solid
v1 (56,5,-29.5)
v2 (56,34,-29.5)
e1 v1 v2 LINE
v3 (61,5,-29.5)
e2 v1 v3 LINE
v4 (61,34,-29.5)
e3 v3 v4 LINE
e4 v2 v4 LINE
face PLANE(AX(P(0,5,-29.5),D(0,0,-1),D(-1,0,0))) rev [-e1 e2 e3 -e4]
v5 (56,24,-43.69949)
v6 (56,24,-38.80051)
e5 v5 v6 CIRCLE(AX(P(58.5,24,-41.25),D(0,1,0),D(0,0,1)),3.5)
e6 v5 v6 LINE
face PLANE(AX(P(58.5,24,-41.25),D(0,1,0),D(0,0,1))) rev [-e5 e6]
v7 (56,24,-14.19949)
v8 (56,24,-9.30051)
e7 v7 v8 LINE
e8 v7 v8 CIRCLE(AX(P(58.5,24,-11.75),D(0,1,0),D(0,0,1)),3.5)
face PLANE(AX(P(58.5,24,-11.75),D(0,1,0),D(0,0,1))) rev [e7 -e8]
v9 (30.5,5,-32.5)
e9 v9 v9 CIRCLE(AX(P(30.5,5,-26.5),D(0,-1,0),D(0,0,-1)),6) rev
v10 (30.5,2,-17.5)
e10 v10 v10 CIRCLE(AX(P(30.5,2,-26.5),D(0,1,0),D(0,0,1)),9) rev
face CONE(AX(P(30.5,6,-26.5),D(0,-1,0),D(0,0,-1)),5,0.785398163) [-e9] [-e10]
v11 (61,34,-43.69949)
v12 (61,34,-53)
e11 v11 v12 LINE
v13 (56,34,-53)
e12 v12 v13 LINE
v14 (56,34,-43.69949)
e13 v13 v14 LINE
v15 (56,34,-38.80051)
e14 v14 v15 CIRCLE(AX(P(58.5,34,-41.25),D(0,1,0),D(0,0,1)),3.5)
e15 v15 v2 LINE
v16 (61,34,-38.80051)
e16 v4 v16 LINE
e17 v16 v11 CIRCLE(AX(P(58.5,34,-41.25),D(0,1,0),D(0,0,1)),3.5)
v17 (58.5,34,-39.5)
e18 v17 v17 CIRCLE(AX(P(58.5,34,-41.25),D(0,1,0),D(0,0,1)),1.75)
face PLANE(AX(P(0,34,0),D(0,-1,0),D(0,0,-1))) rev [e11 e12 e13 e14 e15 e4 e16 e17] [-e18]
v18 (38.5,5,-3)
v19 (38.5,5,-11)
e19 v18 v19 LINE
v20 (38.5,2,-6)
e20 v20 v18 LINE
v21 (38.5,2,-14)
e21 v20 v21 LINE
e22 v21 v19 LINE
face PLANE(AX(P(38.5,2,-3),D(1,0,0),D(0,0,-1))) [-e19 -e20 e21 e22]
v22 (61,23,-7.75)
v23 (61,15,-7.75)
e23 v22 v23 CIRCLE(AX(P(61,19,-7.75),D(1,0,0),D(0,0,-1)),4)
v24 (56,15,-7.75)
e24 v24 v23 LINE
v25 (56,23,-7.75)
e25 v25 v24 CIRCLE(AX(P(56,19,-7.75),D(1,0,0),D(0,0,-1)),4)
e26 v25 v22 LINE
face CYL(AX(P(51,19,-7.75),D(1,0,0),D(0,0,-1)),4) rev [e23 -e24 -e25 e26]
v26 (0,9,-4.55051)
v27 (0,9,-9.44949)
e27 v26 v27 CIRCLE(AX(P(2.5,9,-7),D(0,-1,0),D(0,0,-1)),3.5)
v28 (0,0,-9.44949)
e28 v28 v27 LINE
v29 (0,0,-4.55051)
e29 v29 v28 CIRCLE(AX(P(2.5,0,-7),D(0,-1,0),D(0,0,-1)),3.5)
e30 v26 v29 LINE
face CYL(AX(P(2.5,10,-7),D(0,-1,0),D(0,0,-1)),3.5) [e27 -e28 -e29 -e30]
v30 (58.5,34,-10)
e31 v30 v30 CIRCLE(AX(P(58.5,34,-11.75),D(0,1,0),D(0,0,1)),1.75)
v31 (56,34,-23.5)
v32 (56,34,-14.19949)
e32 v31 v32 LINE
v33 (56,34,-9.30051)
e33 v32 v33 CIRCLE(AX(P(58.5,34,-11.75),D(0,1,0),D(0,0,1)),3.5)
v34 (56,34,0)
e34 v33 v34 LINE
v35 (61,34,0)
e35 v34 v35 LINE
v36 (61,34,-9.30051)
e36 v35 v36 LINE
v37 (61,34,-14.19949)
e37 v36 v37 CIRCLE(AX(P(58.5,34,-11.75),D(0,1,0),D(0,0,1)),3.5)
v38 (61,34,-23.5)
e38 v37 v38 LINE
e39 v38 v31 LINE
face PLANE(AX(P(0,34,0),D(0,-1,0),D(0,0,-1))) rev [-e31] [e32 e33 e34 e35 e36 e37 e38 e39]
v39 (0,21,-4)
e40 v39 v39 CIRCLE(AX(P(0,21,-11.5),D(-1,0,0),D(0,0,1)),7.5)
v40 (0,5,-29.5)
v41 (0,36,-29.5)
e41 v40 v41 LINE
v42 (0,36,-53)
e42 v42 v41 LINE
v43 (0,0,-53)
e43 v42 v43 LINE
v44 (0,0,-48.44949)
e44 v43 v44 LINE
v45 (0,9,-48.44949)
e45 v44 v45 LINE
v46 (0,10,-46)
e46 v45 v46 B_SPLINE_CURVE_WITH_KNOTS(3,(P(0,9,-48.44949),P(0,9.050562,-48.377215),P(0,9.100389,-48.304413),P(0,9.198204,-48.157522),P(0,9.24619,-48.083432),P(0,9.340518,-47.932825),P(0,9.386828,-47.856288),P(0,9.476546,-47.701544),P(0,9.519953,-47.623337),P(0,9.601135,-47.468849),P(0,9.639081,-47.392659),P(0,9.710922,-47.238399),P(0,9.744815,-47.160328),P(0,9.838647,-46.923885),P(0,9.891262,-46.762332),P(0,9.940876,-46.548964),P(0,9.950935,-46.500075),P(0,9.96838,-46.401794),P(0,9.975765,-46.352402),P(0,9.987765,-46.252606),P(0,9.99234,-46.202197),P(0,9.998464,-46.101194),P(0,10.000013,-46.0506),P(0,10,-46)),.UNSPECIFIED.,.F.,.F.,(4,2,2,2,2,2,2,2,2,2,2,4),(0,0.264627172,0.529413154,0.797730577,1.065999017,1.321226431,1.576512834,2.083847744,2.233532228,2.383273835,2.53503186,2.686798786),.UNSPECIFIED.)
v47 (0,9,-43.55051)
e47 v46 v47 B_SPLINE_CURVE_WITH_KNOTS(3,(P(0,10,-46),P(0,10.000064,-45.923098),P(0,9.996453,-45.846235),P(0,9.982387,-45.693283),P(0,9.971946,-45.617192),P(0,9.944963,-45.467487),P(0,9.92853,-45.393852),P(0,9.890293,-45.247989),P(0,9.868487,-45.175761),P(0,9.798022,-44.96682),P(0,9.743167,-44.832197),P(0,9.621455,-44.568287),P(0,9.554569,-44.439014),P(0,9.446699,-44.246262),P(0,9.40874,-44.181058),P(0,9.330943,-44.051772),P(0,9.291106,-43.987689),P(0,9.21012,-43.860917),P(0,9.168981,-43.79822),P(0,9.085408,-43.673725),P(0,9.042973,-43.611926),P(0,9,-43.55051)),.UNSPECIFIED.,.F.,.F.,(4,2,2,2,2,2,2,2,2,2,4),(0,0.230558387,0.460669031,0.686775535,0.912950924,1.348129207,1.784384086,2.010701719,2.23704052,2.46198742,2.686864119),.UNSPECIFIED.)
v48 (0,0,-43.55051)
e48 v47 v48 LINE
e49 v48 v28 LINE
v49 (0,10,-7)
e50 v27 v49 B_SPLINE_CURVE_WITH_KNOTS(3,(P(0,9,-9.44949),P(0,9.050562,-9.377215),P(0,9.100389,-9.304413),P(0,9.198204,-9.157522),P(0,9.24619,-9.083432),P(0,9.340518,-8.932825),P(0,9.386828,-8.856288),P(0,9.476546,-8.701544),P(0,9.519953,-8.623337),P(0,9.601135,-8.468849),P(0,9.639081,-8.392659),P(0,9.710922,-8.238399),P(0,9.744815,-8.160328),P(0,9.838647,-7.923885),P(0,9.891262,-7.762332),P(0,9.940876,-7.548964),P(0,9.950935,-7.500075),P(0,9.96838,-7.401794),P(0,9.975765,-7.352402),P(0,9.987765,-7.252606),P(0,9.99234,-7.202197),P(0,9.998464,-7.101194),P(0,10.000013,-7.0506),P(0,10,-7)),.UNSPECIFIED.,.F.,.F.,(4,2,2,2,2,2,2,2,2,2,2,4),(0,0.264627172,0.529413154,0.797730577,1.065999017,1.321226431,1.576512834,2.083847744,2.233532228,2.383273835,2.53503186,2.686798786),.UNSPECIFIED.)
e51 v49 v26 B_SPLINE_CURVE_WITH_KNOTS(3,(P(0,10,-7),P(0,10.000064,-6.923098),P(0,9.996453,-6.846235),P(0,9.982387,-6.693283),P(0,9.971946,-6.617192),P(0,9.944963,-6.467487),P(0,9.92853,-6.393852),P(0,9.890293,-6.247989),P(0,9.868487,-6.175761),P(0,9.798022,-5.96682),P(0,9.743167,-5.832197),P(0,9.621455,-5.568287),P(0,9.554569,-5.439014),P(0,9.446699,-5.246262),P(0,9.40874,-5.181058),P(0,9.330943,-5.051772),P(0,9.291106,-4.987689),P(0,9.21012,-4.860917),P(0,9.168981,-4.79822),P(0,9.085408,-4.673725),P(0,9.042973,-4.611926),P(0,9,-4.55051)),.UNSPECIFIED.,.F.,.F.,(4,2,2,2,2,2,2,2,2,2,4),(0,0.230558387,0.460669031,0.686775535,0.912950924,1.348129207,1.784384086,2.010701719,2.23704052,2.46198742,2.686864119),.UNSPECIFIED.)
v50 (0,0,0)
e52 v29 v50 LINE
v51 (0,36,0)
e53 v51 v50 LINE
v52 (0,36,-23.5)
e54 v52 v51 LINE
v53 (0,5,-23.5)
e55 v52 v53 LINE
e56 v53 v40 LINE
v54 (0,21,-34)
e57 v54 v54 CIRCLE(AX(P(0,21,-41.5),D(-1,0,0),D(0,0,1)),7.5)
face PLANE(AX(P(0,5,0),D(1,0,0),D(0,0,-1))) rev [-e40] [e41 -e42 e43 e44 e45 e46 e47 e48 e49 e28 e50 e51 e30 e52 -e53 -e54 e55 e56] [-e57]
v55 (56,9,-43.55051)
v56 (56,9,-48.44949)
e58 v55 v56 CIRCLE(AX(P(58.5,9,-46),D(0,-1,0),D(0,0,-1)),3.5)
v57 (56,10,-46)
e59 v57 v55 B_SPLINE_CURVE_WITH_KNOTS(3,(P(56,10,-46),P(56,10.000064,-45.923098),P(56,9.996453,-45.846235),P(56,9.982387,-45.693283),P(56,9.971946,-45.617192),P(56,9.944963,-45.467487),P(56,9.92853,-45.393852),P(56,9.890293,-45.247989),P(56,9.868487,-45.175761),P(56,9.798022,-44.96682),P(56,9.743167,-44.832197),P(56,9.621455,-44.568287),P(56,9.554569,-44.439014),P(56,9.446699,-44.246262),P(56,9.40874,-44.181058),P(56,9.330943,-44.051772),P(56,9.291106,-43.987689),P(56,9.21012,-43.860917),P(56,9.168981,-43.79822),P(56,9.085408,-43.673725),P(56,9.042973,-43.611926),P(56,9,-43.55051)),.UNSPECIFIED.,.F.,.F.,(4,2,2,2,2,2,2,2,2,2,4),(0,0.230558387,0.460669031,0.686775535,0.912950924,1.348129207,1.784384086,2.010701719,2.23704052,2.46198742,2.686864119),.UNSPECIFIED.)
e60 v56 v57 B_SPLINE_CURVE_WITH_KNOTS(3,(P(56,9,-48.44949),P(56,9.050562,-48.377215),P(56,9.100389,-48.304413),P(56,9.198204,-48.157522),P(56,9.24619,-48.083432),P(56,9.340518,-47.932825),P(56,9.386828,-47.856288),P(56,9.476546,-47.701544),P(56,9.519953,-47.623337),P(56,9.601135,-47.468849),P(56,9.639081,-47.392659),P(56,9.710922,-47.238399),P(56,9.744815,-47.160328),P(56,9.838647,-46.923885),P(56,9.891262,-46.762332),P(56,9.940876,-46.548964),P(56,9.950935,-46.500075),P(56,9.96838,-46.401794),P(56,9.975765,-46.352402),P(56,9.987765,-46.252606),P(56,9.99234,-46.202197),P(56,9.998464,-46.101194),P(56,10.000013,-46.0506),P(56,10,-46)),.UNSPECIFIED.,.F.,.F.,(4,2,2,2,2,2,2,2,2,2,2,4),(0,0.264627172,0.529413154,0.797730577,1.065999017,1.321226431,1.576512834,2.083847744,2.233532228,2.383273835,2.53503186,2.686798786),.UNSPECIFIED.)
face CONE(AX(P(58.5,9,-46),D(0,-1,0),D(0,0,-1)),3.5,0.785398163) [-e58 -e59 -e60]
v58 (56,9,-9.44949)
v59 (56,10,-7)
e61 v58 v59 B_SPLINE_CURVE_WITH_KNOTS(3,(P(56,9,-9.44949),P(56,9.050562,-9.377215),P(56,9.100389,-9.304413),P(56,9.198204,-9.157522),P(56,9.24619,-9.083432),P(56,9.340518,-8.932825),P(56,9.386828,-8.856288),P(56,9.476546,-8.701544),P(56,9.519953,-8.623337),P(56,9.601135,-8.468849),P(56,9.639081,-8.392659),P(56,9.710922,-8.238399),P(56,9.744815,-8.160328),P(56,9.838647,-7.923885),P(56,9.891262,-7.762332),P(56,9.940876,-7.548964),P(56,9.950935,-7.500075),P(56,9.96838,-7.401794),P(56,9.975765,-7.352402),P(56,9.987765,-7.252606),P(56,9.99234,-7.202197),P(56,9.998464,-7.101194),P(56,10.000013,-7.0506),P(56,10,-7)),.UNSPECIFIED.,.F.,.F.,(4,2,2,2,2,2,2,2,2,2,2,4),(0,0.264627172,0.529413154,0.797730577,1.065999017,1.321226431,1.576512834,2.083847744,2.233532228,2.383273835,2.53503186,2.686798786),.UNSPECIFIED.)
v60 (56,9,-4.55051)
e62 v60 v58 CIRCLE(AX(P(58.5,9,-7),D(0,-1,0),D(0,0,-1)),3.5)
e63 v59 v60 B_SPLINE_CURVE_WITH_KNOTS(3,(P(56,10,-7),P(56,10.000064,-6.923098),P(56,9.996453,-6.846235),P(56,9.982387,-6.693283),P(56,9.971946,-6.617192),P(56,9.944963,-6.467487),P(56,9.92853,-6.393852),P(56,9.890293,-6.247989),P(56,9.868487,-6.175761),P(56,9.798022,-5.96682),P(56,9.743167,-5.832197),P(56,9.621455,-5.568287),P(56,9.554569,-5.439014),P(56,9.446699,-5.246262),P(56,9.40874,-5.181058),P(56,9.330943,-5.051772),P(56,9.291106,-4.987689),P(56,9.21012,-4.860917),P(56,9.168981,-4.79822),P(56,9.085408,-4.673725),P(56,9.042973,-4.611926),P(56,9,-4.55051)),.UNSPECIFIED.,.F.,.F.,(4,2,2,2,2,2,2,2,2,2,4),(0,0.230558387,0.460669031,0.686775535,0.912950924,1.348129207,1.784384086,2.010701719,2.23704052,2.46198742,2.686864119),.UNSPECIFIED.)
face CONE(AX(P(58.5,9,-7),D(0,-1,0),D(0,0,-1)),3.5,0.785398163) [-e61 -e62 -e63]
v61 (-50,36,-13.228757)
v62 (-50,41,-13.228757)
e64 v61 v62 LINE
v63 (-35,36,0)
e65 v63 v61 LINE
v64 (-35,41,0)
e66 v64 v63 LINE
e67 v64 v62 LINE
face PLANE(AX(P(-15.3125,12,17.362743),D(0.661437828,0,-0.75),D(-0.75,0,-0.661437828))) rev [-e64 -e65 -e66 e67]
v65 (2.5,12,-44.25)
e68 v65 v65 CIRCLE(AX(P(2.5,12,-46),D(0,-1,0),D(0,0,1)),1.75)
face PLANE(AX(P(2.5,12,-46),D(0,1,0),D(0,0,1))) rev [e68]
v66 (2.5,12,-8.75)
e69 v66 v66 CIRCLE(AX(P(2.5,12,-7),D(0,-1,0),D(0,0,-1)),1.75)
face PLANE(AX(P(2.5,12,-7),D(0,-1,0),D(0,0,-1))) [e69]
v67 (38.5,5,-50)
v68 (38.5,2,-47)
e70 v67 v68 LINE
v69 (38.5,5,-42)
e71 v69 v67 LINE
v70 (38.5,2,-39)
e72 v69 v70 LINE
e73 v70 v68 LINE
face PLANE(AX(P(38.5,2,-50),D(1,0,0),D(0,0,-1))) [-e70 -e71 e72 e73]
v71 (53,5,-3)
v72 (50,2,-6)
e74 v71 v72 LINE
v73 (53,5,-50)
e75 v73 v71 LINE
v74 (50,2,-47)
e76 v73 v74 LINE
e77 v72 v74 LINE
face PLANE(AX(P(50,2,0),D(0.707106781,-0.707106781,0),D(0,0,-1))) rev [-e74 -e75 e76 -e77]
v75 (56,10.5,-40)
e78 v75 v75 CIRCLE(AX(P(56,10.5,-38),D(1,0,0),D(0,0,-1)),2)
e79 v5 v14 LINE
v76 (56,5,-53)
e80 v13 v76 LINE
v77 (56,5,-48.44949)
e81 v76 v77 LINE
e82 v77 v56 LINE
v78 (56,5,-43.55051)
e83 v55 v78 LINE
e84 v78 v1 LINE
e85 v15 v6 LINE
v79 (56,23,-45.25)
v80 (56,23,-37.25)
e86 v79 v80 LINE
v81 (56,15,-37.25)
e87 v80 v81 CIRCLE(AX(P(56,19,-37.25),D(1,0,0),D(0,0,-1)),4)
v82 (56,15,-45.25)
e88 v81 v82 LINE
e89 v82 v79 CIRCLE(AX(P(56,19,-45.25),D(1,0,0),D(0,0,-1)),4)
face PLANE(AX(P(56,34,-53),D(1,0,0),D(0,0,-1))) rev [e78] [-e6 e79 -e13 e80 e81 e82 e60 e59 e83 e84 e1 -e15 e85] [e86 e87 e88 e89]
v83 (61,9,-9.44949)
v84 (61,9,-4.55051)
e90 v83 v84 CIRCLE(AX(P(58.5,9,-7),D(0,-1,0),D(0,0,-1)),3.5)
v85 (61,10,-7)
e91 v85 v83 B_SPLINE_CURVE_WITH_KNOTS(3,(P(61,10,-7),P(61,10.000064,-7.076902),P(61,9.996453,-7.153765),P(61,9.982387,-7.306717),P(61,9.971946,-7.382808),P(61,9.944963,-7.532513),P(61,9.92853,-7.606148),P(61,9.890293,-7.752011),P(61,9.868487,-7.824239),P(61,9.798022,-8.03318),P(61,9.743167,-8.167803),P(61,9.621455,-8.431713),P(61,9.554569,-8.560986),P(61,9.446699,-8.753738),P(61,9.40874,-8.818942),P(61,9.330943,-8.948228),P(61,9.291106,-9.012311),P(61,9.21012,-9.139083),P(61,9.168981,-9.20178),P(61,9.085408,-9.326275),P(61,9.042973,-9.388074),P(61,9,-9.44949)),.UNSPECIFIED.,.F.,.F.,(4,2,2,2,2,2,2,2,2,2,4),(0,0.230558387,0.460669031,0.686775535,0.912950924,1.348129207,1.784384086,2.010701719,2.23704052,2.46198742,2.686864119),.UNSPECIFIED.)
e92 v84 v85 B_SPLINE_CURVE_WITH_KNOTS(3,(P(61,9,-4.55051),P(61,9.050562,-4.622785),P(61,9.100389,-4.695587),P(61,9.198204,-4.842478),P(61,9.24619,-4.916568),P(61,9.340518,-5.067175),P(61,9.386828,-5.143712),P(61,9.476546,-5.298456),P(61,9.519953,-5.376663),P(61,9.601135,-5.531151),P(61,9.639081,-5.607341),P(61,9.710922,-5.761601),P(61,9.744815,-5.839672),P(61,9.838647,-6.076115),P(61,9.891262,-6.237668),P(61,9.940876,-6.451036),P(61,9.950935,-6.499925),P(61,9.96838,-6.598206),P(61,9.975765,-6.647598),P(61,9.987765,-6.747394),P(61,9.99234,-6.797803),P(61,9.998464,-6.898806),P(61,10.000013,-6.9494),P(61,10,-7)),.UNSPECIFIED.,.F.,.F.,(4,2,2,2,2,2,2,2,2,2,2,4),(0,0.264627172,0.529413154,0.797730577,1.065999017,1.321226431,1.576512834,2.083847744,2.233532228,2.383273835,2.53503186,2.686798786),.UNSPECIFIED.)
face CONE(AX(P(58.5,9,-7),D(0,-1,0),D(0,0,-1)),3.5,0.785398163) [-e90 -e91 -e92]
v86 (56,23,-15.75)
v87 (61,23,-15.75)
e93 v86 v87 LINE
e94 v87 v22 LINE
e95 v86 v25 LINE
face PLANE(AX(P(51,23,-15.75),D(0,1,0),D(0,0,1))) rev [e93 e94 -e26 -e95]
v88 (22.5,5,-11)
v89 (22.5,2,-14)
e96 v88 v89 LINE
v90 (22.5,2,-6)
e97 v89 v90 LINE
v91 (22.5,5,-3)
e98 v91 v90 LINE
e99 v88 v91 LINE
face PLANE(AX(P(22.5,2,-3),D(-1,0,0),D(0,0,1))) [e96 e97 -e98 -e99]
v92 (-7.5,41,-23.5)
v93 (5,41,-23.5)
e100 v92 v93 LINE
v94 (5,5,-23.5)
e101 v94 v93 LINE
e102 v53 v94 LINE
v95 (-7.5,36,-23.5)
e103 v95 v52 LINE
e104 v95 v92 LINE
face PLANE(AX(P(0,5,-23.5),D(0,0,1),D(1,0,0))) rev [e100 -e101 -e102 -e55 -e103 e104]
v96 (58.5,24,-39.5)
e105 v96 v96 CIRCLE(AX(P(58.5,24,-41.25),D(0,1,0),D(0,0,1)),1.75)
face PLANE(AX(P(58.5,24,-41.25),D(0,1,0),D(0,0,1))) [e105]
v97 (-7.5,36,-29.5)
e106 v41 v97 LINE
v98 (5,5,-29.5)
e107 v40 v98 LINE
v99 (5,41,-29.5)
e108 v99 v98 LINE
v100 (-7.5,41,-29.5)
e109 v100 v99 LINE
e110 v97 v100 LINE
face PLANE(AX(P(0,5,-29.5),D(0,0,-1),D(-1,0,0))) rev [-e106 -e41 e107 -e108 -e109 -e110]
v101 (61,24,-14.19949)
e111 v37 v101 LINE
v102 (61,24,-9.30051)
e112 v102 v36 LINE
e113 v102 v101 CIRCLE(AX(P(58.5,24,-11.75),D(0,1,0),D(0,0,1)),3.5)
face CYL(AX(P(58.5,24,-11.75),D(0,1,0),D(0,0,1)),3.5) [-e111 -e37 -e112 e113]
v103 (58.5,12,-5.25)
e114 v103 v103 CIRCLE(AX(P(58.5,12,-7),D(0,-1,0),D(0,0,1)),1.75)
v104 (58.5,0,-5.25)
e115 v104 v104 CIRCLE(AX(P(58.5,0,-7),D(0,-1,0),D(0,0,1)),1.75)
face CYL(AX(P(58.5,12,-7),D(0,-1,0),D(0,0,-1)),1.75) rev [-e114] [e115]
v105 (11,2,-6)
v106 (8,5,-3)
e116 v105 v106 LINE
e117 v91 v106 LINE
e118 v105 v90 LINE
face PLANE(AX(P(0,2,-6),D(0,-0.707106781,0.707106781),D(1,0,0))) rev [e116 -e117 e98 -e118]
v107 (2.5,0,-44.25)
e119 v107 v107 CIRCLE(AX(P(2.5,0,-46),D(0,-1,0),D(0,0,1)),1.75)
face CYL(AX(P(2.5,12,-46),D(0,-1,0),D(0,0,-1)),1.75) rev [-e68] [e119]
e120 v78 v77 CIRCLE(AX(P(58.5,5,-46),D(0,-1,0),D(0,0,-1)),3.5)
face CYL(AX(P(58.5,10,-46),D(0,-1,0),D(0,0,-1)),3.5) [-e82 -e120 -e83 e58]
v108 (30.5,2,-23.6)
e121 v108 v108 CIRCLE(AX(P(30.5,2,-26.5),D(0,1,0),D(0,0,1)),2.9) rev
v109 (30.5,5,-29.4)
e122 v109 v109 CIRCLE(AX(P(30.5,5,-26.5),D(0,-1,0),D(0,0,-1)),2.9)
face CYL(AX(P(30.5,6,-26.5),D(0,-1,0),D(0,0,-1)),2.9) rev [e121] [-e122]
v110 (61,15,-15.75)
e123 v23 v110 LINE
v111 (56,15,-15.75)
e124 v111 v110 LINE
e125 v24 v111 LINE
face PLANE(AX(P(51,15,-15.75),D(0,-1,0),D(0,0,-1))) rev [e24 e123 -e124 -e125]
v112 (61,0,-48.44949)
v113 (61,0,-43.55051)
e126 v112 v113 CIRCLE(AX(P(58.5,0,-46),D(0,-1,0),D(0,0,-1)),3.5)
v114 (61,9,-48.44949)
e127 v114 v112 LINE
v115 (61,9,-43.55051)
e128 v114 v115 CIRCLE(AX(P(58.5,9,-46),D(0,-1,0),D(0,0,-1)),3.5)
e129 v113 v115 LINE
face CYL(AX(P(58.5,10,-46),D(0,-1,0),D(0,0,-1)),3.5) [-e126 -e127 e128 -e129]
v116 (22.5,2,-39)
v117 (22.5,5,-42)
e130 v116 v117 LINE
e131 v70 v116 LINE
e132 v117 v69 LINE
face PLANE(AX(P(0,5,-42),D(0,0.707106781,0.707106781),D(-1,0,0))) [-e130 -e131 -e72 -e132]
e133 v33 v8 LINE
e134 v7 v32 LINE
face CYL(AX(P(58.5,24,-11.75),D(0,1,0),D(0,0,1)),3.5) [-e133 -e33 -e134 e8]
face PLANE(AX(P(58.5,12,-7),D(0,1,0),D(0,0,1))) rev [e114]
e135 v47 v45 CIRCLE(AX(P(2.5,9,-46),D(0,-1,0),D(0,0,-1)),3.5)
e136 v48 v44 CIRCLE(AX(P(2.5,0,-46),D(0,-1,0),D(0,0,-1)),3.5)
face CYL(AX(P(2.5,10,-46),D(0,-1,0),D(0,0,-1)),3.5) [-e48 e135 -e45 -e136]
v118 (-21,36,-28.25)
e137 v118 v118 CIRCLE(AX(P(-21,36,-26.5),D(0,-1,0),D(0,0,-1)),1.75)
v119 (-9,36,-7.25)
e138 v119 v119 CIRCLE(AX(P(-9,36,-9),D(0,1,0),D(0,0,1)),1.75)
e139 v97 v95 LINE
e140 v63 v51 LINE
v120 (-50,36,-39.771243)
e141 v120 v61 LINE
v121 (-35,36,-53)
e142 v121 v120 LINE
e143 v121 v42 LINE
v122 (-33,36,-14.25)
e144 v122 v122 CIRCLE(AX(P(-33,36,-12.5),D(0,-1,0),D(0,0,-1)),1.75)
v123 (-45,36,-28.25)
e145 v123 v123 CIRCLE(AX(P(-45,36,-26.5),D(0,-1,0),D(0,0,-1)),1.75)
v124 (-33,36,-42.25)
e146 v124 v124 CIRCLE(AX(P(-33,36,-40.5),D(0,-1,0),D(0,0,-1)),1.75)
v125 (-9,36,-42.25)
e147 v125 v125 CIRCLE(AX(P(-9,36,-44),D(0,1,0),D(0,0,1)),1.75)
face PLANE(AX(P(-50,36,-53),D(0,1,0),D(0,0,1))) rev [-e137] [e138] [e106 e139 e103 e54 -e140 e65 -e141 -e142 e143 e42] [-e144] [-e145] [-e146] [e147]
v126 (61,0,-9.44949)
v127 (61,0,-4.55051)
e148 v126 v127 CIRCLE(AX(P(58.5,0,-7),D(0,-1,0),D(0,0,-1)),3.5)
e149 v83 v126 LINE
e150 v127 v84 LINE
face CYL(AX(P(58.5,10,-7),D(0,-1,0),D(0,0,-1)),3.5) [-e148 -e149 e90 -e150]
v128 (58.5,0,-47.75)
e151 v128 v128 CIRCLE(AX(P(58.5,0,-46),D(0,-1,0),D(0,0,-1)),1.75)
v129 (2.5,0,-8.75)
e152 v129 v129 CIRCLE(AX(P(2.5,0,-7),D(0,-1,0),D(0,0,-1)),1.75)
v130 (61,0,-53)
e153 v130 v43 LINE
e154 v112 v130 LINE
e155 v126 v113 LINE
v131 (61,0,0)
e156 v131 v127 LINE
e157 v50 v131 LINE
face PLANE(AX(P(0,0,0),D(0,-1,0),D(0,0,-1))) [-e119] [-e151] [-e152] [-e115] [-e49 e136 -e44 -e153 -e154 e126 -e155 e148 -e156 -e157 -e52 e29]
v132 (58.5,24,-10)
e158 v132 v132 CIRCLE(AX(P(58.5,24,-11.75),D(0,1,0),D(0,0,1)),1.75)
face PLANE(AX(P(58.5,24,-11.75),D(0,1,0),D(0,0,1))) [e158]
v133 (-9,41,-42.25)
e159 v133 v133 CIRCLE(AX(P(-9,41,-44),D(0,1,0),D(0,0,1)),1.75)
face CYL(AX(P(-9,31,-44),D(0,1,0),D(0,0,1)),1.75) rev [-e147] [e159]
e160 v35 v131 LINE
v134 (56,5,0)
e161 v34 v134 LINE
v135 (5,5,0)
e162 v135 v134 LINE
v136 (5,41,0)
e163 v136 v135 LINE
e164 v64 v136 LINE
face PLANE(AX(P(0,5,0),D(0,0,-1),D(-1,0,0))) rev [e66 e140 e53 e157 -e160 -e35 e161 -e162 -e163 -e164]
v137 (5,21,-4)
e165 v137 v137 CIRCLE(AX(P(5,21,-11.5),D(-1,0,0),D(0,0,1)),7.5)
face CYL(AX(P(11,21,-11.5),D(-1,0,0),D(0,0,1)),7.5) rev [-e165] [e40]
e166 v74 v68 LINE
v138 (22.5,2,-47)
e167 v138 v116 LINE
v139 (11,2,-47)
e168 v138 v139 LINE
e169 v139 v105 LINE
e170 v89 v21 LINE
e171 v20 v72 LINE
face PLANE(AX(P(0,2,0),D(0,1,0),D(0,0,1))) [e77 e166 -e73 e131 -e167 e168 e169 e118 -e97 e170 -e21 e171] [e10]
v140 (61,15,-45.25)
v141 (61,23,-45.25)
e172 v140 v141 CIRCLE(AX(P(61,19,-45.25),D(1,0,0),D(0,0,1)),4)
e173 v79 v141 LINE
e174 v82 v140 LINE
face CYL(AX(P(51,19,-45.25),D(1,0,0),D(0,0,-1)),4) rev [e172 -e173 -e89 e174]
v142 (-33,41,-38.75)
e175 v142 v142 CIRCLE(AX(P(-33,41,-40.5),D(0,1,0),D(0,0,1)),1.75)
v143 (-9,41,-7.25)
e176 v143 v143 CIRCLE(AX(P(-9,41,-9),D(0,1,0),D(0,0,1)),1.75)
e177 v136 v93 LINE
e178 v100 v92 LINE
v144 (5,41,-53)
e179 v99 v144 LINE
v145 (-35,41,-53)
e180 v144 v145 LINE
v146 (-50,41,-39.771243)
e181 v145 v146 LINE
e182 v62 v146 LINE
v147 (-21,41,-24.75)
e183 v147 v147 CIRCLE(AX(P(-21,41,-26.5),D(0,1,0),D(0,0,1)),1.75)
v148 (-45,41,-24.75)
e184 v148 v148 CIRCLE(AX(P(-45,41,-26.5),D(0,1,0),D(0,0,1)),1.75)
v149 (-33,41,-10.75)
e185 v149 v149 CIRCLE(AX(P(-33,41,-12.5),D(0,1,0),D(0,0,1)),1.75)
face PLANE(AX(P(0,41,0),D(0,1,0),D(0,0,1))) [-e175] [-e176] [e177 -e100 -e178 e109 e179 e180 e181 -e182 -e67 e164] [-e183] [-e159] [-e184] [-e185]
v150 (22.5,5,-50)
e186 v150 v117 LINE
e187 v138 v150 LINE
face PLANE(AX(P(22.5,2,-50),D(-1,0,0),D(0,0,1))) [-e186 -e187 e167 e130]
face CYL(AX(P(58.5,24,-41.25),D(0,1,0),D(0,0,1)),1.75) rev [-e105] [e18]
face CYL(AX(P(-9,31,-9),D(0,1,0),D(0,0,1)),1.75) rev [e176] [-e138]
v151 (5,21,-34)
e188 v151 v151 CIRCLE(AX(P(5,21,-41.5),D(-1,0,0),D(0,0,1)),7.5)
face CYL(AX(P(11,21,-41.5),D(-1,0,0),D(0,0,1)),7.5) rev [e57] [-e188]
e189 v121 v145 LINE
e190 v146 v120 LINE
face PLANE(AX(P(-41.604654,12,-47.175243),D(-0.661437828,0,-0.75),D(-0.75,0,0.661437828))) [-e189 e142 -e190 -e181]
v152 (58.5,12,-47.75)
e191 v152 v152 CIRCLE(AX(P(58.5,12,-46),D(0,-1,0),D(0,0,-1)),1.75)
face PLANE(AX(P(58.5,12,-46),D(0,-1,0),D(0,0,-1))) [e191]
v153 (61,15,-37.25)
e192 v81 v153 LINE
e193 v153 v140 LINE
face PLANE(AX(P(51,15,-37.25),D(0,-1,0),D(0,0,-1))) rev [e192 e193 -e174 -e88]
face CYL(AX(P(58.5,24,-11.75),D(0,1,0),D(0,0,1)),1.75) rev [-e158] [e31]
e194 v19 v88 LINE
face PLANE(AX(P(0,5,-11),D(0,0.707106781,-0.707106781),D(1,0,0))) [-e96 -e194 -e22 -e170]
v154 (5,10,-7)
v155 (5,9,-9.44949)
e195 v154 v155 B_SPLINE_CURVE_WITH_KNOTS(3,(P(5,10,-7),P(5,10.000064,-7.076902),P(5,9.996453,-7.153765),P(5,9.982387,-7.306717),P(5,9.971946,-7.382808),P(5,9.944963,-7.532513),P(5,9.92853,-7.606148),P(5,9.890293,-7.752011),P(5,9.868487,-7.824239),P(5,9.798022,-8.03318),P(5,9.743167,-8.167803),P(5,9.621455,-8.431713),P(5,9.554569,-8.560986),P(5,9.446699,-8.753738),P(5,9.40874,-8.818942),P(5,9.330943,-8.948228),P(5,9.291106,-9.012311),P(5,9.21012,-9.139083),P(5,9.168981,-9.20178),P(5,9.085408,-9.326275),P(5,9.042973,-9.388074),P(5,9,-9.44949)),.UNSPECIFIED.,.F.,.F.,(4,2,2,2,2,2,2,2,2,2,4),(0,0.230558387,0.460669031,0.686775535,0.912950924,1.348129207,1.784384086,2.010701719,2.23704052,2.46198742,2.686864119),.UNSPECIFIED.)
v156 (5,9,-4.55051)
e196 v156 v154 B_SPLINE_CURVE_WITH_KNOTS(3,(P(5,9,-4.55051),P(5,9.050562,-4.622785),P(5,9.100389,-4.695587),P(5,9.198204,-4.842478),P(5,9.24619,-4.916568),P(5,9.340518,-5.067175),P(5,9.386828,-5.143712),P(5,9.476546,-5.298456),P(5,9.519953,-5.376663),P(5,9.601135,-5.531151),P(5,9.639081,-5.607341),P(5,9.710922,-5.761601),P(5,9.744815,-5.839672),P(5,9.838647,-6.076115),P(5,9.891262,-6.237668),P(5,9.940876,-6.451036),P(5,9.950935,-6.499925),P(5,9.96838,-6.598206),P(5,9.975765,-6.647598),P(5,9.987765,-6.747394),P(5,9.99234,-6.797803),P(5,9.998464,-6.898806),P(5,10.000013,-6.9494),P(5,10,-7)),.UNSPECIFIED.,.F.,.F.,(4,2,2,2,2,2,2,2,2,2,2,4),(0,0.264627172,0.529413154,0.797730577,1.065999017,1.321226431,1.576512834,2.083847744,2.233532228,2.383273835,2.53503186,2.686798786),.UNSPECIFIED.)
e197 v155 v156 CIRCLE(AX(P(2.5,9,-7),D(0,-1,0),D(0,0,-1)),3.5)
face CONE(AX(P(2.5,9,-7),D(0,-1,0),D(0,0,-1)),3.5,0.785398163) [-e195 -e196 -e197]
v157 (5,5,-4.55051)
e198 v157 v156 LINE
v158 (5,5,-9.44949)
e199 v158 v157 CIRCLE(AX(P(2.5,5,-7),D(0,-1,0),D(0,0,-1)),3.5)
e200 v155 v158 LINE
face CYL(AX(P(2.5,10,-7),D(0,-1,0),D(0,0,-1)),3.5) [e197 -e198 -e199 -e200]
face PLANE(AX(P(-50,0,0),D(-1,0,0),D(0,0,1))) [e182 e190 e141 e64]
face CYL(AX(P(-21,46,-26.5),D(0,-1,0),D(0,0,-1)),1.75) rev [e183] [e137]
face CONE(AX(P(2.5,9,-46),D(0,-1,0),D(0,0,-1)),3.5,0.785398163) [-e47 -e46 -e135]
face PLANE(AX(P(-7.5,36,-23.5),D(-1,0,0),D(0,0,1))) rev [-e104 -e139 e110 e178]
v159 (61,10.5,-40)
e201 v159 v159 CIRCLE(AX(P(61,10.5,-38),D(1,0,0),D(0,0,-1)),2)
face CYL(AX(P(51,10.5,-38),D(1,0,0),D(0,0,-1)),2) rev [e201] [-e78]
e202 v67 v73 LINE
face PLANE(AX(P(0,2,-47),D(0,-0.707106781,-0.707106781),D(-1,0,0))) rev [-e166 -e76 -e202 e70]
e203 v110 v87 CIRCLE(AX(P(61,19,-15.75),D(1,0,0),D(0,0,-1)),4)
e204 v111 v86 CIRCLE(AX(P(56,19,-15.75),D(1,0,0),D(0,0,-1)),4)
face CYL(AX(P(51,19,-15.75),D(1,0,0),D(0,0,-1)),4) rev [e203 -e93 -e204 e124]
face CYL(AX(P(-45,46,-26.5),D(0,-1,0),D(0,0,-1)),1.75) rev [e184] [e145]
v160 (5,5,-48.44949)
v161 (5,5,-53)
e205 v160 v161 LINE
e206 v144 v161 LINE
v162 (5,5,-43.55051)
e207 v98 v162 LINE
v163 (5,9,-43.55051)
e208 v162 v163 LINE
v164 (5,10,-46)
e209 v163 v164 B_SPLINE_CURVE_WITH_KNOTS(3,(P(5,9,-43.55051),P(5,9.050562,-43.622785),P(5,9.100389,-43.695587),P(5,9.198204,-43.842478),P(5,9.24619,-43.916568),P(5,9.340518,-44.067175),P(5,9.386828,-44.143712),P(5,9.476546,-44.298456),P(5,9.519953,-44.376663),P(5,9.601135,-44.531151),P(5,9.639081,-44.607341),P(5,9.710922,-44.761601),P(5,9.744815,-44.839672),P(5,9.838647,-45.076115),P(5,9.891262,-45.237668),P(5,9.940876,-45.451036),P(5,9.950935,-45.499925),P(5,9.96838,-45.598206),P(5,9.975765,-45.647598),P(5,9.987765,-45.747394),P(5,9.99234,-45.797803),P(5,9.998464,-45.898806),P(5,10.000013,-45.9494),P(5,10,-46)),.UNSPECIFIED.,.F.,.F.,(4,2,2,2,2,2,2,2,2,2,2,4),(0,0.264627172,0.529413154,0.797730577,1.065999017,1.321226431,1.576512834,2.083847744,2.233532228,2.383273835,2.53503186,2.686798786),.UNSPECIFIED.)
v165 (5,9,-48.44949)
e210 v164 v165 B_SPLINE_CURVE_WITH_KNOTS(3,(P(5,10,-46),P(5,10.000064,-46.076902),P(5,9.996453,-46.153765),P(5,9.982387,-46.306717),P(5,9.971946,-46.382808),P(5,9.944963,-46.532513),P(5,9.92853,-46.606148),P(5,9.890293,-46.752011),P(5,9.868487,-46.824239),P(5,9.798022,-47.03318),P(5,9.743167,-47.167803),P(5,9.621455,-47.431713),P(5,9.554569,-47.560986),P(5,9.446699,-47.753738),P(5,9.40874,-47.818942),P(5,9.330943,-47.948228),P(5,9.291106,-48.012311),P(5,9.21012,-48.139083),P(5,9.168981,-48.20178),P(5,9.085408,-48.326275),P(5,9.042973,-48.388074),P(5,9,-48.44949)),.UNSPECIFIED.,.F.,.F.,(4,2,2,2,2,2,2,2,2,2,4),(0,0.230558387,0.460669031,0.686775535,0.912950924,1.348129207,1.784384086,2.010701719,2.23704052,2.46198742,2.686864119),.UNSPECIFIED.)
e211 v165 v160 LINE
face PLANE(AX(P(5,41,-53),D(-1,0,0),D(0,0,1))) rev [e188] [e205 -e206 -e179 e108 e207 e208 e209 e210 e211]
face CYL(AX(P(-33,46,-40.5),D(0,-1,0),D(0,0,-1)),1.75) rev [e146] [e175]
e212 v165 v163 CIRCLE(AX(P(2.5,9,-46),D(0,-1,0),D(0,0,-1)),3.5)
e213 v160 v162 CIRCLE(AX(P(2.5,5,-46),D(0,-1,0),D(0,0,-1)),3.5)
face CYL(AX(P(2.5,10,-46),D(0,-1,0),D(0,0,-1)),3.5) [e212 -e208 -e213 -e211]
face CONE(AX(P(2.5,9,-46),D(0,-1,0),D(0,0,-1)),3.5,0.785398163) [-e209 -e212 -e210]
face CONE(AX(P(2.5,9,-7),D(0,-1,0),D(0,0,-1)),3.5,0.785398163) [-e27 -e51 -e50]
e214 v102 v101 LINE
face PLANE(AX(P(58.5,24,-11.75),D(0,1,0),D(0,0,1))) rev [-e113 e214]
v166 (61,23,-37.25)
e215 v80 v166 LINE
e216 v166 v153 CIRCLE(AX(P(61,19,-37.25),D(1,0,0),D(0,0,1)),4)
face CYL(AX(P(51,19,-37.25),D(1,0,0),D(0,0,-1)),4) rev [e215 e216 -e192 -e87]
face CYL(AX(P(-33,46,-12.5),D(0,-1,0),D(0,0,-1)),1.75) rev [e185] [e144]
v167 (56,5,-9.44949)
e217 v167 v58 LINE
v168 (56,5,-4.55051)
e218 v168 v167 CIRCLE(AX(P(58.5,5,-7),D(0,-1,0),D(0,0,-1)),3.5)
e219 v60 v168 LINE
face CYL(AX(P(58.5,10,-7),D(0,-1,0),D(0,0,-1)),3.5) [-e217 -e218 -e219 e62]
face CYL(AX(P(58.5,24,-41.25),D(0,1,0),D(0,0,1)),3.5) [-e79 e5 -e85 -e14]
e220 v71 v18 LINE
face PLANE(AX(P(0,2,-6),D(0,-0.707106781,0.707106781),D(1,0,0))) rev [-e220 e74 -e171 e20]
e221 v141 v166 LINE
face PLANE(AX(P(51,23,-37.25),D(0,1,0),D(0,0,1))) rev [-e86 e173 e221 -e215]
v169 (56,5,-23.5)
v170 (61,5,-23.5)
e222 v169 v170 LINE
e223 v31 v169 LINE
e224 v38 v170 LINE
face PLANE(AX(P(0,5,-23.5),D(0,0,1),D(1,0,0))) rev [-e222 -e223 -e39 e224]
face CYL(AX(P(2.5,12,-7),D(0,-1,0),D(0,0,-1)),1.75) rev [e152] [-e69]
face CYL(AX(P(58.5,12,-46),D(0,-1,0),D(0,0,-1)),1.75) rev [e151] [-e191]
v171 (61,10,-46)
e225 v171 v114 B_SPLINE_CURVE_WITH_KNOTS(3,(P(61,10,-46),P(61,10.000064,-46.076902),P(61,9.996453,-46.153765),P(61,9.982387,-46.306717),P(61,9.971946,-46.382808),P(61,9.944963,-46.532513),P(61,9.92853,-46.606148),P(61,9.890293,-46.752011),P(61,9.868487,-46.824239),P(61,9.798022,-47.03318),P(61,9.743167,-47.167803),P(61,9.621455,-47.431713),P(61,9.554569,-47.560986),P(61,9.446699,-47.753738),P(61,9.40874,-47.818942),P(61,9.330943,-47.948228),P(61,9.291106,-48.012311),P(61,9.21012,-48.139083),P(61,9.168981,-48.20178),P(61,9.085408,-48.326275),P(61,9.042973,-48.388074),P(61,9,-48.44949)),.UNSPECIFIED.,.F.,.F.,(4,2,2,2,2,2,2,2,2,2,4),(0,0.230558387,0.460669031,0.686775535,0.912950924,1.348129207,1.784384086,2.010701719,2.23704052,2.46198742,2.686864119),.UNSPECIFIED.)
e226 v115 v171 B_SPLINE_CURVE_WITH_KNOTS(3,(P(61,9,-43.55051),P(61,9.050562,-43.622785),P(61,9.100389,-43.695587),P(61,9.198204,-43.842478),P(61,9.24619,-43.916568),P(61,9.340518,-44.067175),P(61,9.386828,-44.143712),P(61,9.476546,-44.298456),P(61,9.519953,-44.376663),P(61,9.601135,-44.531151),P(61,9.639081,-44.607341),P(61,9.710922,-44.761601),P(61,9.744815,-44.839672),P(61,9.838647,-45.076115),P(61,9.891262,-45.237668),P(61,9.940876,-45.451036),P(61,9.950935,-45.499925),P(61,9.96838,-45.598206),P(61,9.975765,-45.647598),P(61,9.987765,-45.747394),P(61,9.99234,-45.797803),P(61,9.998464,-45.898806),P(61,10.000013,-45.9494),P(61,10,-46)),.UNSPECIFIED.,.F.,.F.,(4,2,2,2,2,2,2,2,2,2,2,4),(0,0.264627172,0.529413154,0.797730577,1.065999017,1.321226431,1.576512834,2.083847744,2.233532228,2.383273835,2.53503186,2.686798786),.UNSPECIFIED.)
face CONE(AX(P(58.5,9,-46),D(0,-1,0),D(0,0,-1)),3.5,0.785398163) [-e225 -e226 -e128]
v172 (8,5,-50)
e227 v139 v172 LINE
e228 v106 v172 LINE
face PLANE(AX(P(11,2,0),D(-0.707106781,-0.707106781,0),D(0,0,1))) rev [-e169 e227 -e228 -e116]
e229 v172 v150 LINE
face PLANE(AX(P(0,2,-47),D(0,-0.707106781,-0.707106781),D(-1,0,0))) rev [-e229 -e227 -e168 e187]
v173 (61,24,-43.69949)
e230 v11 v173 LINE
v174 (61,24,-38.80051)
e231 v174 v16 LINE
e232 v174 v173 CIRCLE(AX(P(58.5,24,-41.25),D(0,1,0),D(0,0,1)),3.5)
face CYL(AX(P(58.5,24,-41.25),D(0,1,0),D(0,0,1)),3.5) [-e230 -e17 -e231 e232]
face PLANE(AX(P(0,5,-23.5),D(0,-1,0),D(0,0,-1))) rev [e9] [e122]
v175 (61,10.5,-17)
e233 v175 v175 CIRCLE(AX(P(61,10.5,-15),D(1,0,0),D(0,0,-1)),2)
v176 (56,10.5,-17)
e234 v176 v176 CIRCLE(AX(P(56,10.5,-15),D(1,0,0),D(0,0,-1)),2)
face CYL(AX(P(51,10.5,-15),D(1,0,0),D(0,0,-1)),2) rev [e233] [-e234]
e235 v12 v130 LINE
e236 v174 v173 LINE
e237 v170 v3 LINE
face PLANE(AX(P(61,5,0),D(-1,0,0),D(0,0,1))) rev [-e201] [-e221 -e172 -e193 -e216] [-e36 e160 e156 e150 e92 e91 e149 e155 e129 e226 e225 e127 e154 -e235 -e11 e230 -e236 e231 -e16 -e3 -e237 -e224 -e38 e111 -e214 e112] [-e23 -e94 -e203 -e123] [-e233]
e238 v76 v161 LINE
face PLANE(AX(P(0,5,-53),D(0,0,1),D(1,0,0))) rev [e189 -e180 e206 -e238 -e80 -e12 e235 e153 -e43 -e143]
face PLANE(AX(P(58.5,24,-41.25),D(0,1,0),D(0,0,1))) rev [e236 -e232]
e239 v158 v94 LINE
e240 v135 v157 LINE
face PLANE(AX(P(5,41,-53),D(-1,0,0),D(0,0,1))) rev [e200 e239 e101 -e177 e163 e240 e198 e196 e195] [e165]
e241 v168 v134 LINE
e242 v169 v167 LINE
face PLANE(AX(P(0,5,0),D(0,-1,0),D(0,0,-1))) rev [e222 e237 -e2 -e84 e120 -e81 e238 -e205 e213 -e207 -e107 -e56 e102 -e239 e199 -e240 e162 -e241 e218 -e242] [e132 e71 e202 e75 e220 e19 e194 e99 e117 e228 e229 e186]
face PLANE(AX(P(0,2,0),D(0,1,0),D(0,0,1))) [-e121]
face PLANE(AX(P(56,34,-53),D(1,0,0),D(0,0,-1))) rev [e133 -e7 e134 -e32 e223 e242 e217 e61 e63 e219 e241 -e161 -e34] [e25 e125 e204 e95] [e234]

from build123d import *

# Parameters (mm, degrees)
IZIM1_W                     = 61
IZIM1_H                     = 53
Y_KSEKLIK_EKSTR_ZYON1_DEPTH = 5
IZIM2_W                     = 5
IZIM2_H                     = 53
Y_KSEKLIK_EKSTR_ZYON2_DEPTH = 36
IZIM3_W                     = 53
IZIM3_H                     = 5
Y_KSEKLIK_EKSTR_ZYON3_DEPTH = 50
IZIM4_W                     = 5
IZIM4_H                     = 53
Y_KSEKLIK_EKSTR_ZYON4_DEPTH = 29
KES_EKSTR_ZYON1_DEPTH       = 29
IZIM6_W                     = 47
IZIM6_H                     = 49
KES_EKSTR_ZYON2_DEPTH       = 3
IZIM7_R                     = 5
IZIM7_R_2                   = 2.9
Y_KSEKLIK_EKSTR_ZYON5_DEPTH = 4
PAH2_SIZE                   = 4
KES_EKSTR_ZYON4_START       = -61
IZIM8_W                     = 6
IZIM8_H                     = 36
KES_EKSTR_ZYON4_DEPTH       = 61
IZIM9_W                     = 12.5
IZIM9_H                     = 6
KES_EKSTR_ZYON5_DEPTH       = 5
KES_EKSTR_ZYON7_START       = -31.5
IZIM11_W                    = 51
IZIM11_H                    = 29
KES_EKSTR_ZYON7_DEPTH       = 10
PAH3_SIZE                   = 4
IZIM12_R                    = 1.75
KES_EKSTR_ZYON8_DEPTH       = 12
IZIM13_R                    = 3.5
IZIM13_R_2                  = 2
Y_KSEKLIK_EKSTR_ZYON6_DEPTH = 10
PAH4_SIZE                   = 1
PAH5_SIZE                   = 1
IZIM14_R                    = 1.75
KES_EKSTR_ZYON9_DEPTH       = 10
IZIM15_R                    = 3.5
IZIM15_R_2                  = 2
Y_KSEKLIK_EKSTR_ZYON7_DEPTH = 10
IZIM16_R                    = 1.75
KES_EKSTR_ZYON10_DEPTH      = 10
IZIM17_R                    = 1.75
KES_EKSTR_ZYON11_DEPTH      = 10
IZIM18_R                    = 2
KES_EKSTR_ZYON12_DEPTH      = 10
IZIM23_R                    = 7.5
KES_EKSTR_ZYON17_DEPTH      = 11
KES_EKSTR_ZYON18_DEPTH      = 10
IZIM25_W                    = 16
IZIM25_H                    = 12
Y_KSEKLIK_EKSTR_ZYON8_DEPTH = 5
PAH6_SIZE                   = 4


# Some blends are built 0.0001 mm under size
with BuildPart() as part:
    # Çizim1 → Yükseklik-Ekstrüzyon1 (new body)
    with BuildSketch(Plane(origin=(0, 0, 0), x_dir=(1, 0, 0), z_dir=(0, 1, 0))):
        with Locations((30.5, 26.5)):
            Rectangle(IZIM1_W, IZIM1_H)
    extrude(amount=Y_KSEKLIK_EKSTR_ZYON1_DEPTH)

    # Çizim2 → Yükseklik-Ekstrüzyon2 (add)
    with BuildSketch(Plane(origin=(0, 5, 0), x_dir=(1, 0, 0), z_dir=(0, 1, 0))):
        with Locations((2.5, 26.5)):
            Rectangle(IZIM2_W, IZIM2_H)
    extrude(amount=Y_KSEKLIK_EKSTR_ZYON2_DEPTH)

    # Çizim3 → Yükseklik-Ekstrüzyon3 (add)
    with BuildSketch(Plane.ZY):
        with Locations((-26.5, 38.5)):
            Rectangle(IZIM3_W, IZIM3_H)
    extrude(amount=Y_KSEKLIK_EKSTR_ZYON3_DEPTH)

    # Çizim4 → Yükseklik-Ekstrüzyon4 (add)
    with BuildSketch(Plane(origin=(0, 5, 0), x_dir=(1, 0, 0), z_dir=(0, 1, 0))):
        with Locations((58.5, 26.5)):
            Rectangle(IZIM4_W, IZIM4_H)
    extrude(amount=Y_KSEKLIK_EKSTR_ZYON4_DEPTH)

    # Çizim5 → Kes-Ekstrüzyon1 (cut)
    with BuildSketch(Plane(origin=(0, 41, 0), x_dir=(1, 0, 0), z_dir=(0, 1, 0))):
        Polygon((-50, 39.771243445), (-35, 53), (-50, 53), align=None)
        Polygon((-35, 0), (-50, 13.228756555), (-50, 0), align=None)
    extrude(amount=-KES_EKSTR_ZYON1_DEPTH, mode=Mode.SUBTRACT)

    # Çizim6 → Kes-Ekstrüzyon2 (cut)
    with BuildSketch(Plane(origin=(0, 5, 0), x_dir=(1, 0, 0), z_dir=(0, 1, 0))):
        with Locations((30.5, 26.5)):
            Rectangle(IZIM6_W, IZIM6_H)
    extrude(amount=-KES_EKSTR_ZYON2_DEPTH, mode=Mode.SUBTRACT)

    # Çizim7 → Yükseklik-Ekstrüzyon5 (add)
    with BuildSketch(Plane(origin=(0, 2, 0), x_dir=(1, 0, 0), z_dir=(0, 1, 0))):
        with Locations(Location((30.5, 26.5, 0), (0, 0, 270))):
            Circle(IZIM7_R)
        with Locations(Location((30.5, 26.5, 0), (0, 0, 270))):
            Circle(IZIM7_R_2, mode=Mode.SUBTRACT)
    extrude(amount=Y_KSEKLIK_EKSTR_ZYON5_DEPTH)

    # Pah2
    # the kernel refuses this chamfer: 4 mm, written as the material it adds along each edge
    with BuildSketch(Plane(origin=(54, 2, -2), x_dir=(0, 0.9996219169112968, 0.027495876610586382), z_dir=(-1, 0, 0))) as pah2_piece_1_section:
        Polygon((PAH2_SIZE * 0.999621916911, PAH2_SIZE * 0.0274958766106), (-PAH2_SIZE * 0.0274958766106, PAH2_SIZE * 0.999621916911), (0, 0), align=None)
    pah2_piece_1 = extrude(amount=47, mode=Mode.PRIVATE)
    pah2_piece_1 = split(pah2_piece_1, bisect_by=Plane(origin=(30.5, 5, -3.4), z_dir=(0, -1, 0)), keep=Keep.TOP, mode=Mode.PRIVATE)
    add(pah2_piece_1)
    with BuildSketch(Plane(origin=(54, 2, -51), x_dir=(0.02749587661058563, 0.9996219169112968, 0), z_dir=(0, 0, 1))) as pah2_piece_2_section:
        Polygon((PAH2_SIZE * 0.999621916911, PAH2_SIZE * 0.0274958766106), (-PAH2_SIZE * 0.0274958766106, PAH2_SIZE * 0.999621916911), (0, 0), align=None)
    pah2_piece_2 = extrude(amount=49, mode=Mode.PRIVATE)
    pah2_piece_2 = split(pah2_piece_2, bisect_by=Plane(origin=(52.6, 5, -26.5), z_dir=(0, -1, 0)), keep=Keep.TOP, mode=Mode.PRIVATE)
    add(pah2_piece_2)
    with BuildSketch(Plane(origin=(7, 2, -2), x_dir=(-0.027495876610586275, 0.9996219169112968, 0), z_dir=(0, 0, -1))) as pah2_piece_3_section:
        Polygon((PAH2_SIZE * 0.999621916911, PAH2_SIZE * 0.0274958766106), (-PAH2_SIZE * 0.0274958766106, PAH2_SIZE * 0.999621916911), (0, 0), align=None)
    pah2_piece_3 = extrude(amount=49, mode=Mode.PRIVATE)
    pah2_piece_3 = split(pah2_piece_3, bisect_by=Plane(origin=(8.4, 5, -26.5), z_dir=(0, -1, 0)), keep=Keep.TOP, mode=Mode.PRIVATE)
    add(pah2_piece_3)
    with BuildSketch(Plane(origin=(7, 2, -51), x_dir=(0, 0.9996219169112968, -0.02749587661058563), z_dir=(1, 0, 0))) as pah2_piece_4_section:
        Polygon((PAH2_SIZE * 0.999621916911, PAH2_SIZE * 0.0274958766106), (-PAH2_SIZE * 0.0274958766106, PAH2_SIZE * 0.999621916911), (0, 0), align=None)
    pah2_piece_4 = extrude(amount=47, mode=Mode.PRIVATE)
    pah2_piece_4 = split(pah2_piece_4, bisect_by=Plane(origin=(30.5, 5, -49.6), z_dir=(0, -1, 0)), keep=Keep.TOP, mode=Mode.PRIVATE)
    add(pah2_piece_4)

    # Çizim8 → Kes-Ekstrüzyon4 (cut)
    with BuildSketch(Plane(origin=(61, 0, 0), x_dir=(0, 0, -1), z_dir=(1, 0, 0)).offset(KES_EKSTR_ZYON4_START)):
        with Locations((26.5, 23)):
            Rectangle(IZIM8_W, IZIM8_H)
    extrude(amount=KES_EKSTR_ZYON4_DEPTH, mode=Mode.SUBTRACT)

    # Çizim9 → Kes-Ekstrüzyon5 (cut)
    with BuildSketch(Plane(origin=(0, 41, 0), x_dir=(1, 0, 0), z_dir=(0, 1, 0))):
        with Locations((-1.25, 26.5)):
            Rectangle(IZIM9_W, IZIM9_H)
    extrude(amount=-KES_EKSTR_ZYON5_DEPTH, mode=Mode.SUBTRACT)

    # Çizim11 → Kes-Ekstrüzyon7 (cut)
    with BuildSketch(Plane.XY.offset(KES_EKSTR_ZYON7_START)):
        with Locations((30.5, 19.5)):
            Rectangle(IZIM11_W, IZIM11_H)
    extrude(amount=KES_EKSTR_ZYON7_DEPTH, mode=Mode.SUBTRACT)

    # Pah3
    # the kernel refuses this chamfer: 4 mm, written as the material it adds along each edge
    with BuildSketch(Plane(origin=(30.5, 2, -26.5), x_dir=(0, 0, 1), z_dir=(-1, 0, 0))) as pah3_piece_1_section:
        Polygon((5 + PAH3_SIZE, 0), (5, PAH3_SIZE), (5, 0), align=None)
    pah3_piece_1 = revolve(axis=Axis((30.5, 2, -26.5), (0, 1, 0)), mode=Mode.PRIVATE)
    pah3_piece_1 = split(pah3_piece_1, bisect_by=Plane(origin=(30.5, 5, -34.0078168), z_dir=(0, -1, 0)), keep=Keep.TOP, mode=Mode.PRIVATE)
    add(pah3_piece_1)

    # Çizim12 → Kes-Ekstrüzyon8 (cut)
    with BuildSketch(Plane.XZ):
        with Locations(Location((2.5, -7, 0), (0, 0, 270))):
            Circle(IZIM12_R)
        with Locations(Location((2.5, -46, 0), (0, 0, 90))):
            Circle(IZIM12_R)
        with Locations(Location((58.5, -7, 0), (0, 0, 90))):
            Circle(IZIM12_R)
        with Locations(Location((58.5, -46, 0), (0, 0, 270))):
            Circle(IZIM12_R)
    extrude(amount=-KES_EKSTR_ZYON8_DEPTH, mode=Mode.SUBTRACT)

    # Çizim13 → Yükseklik-Ekstrüzyon6 (add)
    # profile 1 of 4: a face of its own
    with BuildSketch(Plane.XZ):
        with Locations((2.5, -7)):
            Circle(IZIM13_R)
        with Locations((2.5, -7)):
            Circle(IZIM13_R_2, mode=Mode.SUBTRACT)
    # profile 2 of 4: a face of its own
    with BuildSketch(Plane.XZ):
        with Locations((58.5, -7)):
            Circle(IZIM13_R)
        with Locations((58.5, -7)):
            Circle(IZIM13_R_2, mode=Mode.SUBTRACT)
    # profile 3 of 4: a face of its own
    with BuildSketch(Plane.XZ):
        with Locations((58.5, -46)):
            Circle(IZIM13_R)
        with Locations((58.5, -46)):
            Circle(IZIM13_R_2, mode=Mode.SUBTRACT)
    # profile 4 of 4: a face of its own
    with BuildSketch(Plane.XZ):
        with Locations((2.5, -46)):
            Circle(IZIM13_R)
        with Locations((2.5, -46)):
            Circle(IZIM13_R_2, mode=Mode.SUBTRACT)
    extrude(amount=-Y_KSEKLIK_EKSTR_ZYON6_DEPTH)

    # Pah4
    pah4_edges = [part.edges().sort_by_distance(p)[0] for p in [
        (62, 10, -7),
    ]]
    chamfer(pah4_edges, length=PAH4_SIZE - 0.0001)  # a hair under: the kernel refuses the full size

    # Pah5
    pah5_edges = [part.edges().sort_by_distance(p)[0] for p in [
        (6, 10, -46),
        (6, 10, -7),
        (55, 10, -7),
        (55, 10, -46),
        (-1, 10, -46),
        (-1, 10, -7),
        (62, 10, -46),
    ]]
    chamfer(pah5_edges, length=PAH5_SIZE - 0.0001)  # a hair under: the kernel refuses the full size

    # Çizim14 → Kes-Ekstrüzyon9 (cut)
    with BuildSketch(Plane(origin=(0, 34, 0), x_dir=(1, 0, 0), z_dir=(0, 1, 0))):
        with Locations(Location((58.5, 41.25, 0), (0, 0, 270))):
            Circle(IZIM14_R)
        with Locations(Location((58.5, 11.75, 0), (0, 0, 270))):
            Circle(IZIM14_R)
    extrude(amount=-KES_EKSTR_ZYON9_DEPTH, mode=Mode.SUBTRACT)

    # Çizim15 → Yükseklik-Ekstrüzyon7 (add)
    # profile 1 of 2: a face of its own
    with BuildSketch(Plane(origin=(0, 34, 0), x_dir=(1, 0, 0), z_dir=(0, 1, 0))):
        with Locations((58.5, 41.25)):
            Circle(IZIM15_R)
        with Locations((58.5, 41.25)):
            Circle(IZIM15_R_2, mode=Mode.SUBTRACT)
    # profile 2 of 2: a face of its own
    with BuildSketch(Plane(origin=(0, 34, 0), x_dir=(1, 0, 0), z_dir=(0, 1, 0))):
        with Locations((58.5, 11.75)):
            Circle(IZIM15_R)
        with Locations((58.5, 11.75)):
            Circle(IZIM15_R_2, mode=Mode.SUBTRACT)
    extrude(amount=-Y_KSEKLIK_EKSTR_ZYON7_DEPTH)

    # Çizim16 → Kes-Ekstrüzyon10 (cut)
    with BuildSketch(Plane.XZ.offset(-36)):
        with Locations(Location((-33, -12.5, 0), (0, 0, 270))):
            Circle(IZIM16_R)
        with Locations(Location((-33, -40.5, 0), (0, 0, 270))):
            Circle(IZIM16_R)
        with Locations(Location((-21, -26.5, 0), (0, 0, 270))):
            Circle(IZIM16_R)
        with Locations(Location((-45, -26.5, 0), (0, 0, 270))):
            Circle(IZIM16_R)
    extrude(amount=-KES_EKSTR_ZYON10_DEPTH, mode=Mode.SUBTRACT)

    # Çizim17 → Kes-Ekstrüzyon11 (cut)
    with BuildSketch(Plane(origin=(0, 41, 0), x_dir=(1, 0, 0), z_dir=(0, 1, 0))):
        with Locations(Location((-9, 44, 0), (0, 0, 270))):
            Circle(IZIM17_R)
        with Locations(Location((-9, 9, 0), (0, 0, 270))):
            Circle(IZIM17_R)
    extrude(amount=-KES_EKSTR_ZYON11_DEPTH, mode=Mode.SUBTRACT)

    # Çizim18 → Kes-Ekstrüzyon12 (cut)
    with BuildSketch(Plane(origin=(61, 0, 0), x_dir=(0, 0, -1), z_dir=(1, 0, 0))):
        with Locations((15, 10.5)):
            Circle(IZIM18_R)
        with Locations((38, 10.5)):
            Circle(IZIM18_R)
    extrude(amount=-KES_EKSTR_ZYON12_DEPTH, mode=Mode.SUBTRACT)

    # Çizim23 → Kes-Ekstrüzyon17 (cut)
    with BuildSketch(Plane.ZY):
        with Locations((-41.5, 21)):
            Circle(IZIM23_R)
        with Locations((-11.5, 21)):
            Circle(IZIM23_R)
    extrude(amount=-KES_EKSTR_ZYON17_DEPTH, mode=Mode.SUBTRACT)

    # Çizim24 → Kes-Ekstrüzyon18 (cut)
    with BuildSketch(Plane(origin=(61, 0, 0), x_dir=(0, 0, -1), z_dir=(1, 0, 0))):
        with BuildLine():
            Line((15.75, 15), (7.75, 15))
            ThreePointArc((7.75, 15), (3.75, 19), (7.75, 23))
            Line((7.75, 23), (15.75, 23))
            ThreePointArc((15.75, 23), (19.75, 19), (15.75, 15))
        make_face()
        with BuildLine():
            Line((37.25, 15), (45.25, 15))
            ThreePointArc((45.25, 15), (49.25, 19), (45.25, 23))
            Line((45.25, 23), (37.25, 23))
            ThreePointArc((37.25, 23), (33.25, 19), (37.25, 15))
        make_face()
    extrude(amount=-KES_EKSTR_ZYON18_DEPTH, mode=Mode.SUBTRACT)

    # Çizim25 → Yükseklik-Ekstrüzyon8 (add)
    with BuildSketch(Plane(origin=(0, 5, 0), x_dir=(1, 0, 0), z_dir=(0, 1, 0))):
        with Locations((30.5, 44)):
            Rectangle(IZIM25_W, IZIM25_H)
        with Locations((30.5, 9)):
            Rectangle(IZIM25_W, IZIM25_H)
    extrude(amount=-Y_KSEKLIK_EKSTR_ZYON8_DEPTH)

    # Pah6
    # the kernel refuses this chamfer: 4 mm, written as the material it adds along each edge
    # the kernel refuses this chamfer: 4 mm, written as the material it takes off along each edge
    with BuildSketch(Plane(origin=(48.786731952, 5, -38), x_dir=(0, 0.027495876610586296, -0.9996219169112968), z_dir=(-1, 0, 0))) as pah6_2_piece_1_section:
        Polygon((PAH6_SIZE * 0.999621916911, PAH6_SIZE * 0.0274958766106), (-PAH6_SIZE * 0.0274958766106, PAH6_SIZE * 0.999621916911), (0, 0), align=None)
    pah6_2_piece_1 = extrude(amount=36.573463904, mode=Mode.PRIVATE)
    pah6_2_piece_1 = split(pah6_2_piece_1, bisect_by=Plane(origin=(30.5, 2, -39.4), z_dir=(0, 1, 0)), keep=Keep.TOP, mode=Mode.PRIVATE)
    add(pah6_2_piece_1, mode=Mode.SUBTRACT)
    with BuildSketch(Plane(origin=(48.786731952, 5, -15), x_dir=(0, 0.02749587661058627, 0.9996219169112968), z_dir=(-1, 0, 0))) as pah6_2_piece_2_section:
        Polygon((PAH6_SIZE * 0.999621916911, -PAH6_SIZE * 0.0274958766106), (-PAH6_SIZE * 0.0274958766106, -PAH6_SIZE * 0.999621916911), (0, 0), align=None)
    pah6_2_piece_2 = extrude(amount=36.573463904, mode=Mode.PRIVATE)
    pah6_2_piece_2 = split(pah6_2_piece_2, bisect_by=Plane(origin=(30.5, 2, -13.6), z_dir=(0, 1, 0)), keep=Keep.TOP, mode=Mode.PRIVATE)
    add(pah6_2_piece_2, mode=Mode.SUBTRACT)


solid = part.part
